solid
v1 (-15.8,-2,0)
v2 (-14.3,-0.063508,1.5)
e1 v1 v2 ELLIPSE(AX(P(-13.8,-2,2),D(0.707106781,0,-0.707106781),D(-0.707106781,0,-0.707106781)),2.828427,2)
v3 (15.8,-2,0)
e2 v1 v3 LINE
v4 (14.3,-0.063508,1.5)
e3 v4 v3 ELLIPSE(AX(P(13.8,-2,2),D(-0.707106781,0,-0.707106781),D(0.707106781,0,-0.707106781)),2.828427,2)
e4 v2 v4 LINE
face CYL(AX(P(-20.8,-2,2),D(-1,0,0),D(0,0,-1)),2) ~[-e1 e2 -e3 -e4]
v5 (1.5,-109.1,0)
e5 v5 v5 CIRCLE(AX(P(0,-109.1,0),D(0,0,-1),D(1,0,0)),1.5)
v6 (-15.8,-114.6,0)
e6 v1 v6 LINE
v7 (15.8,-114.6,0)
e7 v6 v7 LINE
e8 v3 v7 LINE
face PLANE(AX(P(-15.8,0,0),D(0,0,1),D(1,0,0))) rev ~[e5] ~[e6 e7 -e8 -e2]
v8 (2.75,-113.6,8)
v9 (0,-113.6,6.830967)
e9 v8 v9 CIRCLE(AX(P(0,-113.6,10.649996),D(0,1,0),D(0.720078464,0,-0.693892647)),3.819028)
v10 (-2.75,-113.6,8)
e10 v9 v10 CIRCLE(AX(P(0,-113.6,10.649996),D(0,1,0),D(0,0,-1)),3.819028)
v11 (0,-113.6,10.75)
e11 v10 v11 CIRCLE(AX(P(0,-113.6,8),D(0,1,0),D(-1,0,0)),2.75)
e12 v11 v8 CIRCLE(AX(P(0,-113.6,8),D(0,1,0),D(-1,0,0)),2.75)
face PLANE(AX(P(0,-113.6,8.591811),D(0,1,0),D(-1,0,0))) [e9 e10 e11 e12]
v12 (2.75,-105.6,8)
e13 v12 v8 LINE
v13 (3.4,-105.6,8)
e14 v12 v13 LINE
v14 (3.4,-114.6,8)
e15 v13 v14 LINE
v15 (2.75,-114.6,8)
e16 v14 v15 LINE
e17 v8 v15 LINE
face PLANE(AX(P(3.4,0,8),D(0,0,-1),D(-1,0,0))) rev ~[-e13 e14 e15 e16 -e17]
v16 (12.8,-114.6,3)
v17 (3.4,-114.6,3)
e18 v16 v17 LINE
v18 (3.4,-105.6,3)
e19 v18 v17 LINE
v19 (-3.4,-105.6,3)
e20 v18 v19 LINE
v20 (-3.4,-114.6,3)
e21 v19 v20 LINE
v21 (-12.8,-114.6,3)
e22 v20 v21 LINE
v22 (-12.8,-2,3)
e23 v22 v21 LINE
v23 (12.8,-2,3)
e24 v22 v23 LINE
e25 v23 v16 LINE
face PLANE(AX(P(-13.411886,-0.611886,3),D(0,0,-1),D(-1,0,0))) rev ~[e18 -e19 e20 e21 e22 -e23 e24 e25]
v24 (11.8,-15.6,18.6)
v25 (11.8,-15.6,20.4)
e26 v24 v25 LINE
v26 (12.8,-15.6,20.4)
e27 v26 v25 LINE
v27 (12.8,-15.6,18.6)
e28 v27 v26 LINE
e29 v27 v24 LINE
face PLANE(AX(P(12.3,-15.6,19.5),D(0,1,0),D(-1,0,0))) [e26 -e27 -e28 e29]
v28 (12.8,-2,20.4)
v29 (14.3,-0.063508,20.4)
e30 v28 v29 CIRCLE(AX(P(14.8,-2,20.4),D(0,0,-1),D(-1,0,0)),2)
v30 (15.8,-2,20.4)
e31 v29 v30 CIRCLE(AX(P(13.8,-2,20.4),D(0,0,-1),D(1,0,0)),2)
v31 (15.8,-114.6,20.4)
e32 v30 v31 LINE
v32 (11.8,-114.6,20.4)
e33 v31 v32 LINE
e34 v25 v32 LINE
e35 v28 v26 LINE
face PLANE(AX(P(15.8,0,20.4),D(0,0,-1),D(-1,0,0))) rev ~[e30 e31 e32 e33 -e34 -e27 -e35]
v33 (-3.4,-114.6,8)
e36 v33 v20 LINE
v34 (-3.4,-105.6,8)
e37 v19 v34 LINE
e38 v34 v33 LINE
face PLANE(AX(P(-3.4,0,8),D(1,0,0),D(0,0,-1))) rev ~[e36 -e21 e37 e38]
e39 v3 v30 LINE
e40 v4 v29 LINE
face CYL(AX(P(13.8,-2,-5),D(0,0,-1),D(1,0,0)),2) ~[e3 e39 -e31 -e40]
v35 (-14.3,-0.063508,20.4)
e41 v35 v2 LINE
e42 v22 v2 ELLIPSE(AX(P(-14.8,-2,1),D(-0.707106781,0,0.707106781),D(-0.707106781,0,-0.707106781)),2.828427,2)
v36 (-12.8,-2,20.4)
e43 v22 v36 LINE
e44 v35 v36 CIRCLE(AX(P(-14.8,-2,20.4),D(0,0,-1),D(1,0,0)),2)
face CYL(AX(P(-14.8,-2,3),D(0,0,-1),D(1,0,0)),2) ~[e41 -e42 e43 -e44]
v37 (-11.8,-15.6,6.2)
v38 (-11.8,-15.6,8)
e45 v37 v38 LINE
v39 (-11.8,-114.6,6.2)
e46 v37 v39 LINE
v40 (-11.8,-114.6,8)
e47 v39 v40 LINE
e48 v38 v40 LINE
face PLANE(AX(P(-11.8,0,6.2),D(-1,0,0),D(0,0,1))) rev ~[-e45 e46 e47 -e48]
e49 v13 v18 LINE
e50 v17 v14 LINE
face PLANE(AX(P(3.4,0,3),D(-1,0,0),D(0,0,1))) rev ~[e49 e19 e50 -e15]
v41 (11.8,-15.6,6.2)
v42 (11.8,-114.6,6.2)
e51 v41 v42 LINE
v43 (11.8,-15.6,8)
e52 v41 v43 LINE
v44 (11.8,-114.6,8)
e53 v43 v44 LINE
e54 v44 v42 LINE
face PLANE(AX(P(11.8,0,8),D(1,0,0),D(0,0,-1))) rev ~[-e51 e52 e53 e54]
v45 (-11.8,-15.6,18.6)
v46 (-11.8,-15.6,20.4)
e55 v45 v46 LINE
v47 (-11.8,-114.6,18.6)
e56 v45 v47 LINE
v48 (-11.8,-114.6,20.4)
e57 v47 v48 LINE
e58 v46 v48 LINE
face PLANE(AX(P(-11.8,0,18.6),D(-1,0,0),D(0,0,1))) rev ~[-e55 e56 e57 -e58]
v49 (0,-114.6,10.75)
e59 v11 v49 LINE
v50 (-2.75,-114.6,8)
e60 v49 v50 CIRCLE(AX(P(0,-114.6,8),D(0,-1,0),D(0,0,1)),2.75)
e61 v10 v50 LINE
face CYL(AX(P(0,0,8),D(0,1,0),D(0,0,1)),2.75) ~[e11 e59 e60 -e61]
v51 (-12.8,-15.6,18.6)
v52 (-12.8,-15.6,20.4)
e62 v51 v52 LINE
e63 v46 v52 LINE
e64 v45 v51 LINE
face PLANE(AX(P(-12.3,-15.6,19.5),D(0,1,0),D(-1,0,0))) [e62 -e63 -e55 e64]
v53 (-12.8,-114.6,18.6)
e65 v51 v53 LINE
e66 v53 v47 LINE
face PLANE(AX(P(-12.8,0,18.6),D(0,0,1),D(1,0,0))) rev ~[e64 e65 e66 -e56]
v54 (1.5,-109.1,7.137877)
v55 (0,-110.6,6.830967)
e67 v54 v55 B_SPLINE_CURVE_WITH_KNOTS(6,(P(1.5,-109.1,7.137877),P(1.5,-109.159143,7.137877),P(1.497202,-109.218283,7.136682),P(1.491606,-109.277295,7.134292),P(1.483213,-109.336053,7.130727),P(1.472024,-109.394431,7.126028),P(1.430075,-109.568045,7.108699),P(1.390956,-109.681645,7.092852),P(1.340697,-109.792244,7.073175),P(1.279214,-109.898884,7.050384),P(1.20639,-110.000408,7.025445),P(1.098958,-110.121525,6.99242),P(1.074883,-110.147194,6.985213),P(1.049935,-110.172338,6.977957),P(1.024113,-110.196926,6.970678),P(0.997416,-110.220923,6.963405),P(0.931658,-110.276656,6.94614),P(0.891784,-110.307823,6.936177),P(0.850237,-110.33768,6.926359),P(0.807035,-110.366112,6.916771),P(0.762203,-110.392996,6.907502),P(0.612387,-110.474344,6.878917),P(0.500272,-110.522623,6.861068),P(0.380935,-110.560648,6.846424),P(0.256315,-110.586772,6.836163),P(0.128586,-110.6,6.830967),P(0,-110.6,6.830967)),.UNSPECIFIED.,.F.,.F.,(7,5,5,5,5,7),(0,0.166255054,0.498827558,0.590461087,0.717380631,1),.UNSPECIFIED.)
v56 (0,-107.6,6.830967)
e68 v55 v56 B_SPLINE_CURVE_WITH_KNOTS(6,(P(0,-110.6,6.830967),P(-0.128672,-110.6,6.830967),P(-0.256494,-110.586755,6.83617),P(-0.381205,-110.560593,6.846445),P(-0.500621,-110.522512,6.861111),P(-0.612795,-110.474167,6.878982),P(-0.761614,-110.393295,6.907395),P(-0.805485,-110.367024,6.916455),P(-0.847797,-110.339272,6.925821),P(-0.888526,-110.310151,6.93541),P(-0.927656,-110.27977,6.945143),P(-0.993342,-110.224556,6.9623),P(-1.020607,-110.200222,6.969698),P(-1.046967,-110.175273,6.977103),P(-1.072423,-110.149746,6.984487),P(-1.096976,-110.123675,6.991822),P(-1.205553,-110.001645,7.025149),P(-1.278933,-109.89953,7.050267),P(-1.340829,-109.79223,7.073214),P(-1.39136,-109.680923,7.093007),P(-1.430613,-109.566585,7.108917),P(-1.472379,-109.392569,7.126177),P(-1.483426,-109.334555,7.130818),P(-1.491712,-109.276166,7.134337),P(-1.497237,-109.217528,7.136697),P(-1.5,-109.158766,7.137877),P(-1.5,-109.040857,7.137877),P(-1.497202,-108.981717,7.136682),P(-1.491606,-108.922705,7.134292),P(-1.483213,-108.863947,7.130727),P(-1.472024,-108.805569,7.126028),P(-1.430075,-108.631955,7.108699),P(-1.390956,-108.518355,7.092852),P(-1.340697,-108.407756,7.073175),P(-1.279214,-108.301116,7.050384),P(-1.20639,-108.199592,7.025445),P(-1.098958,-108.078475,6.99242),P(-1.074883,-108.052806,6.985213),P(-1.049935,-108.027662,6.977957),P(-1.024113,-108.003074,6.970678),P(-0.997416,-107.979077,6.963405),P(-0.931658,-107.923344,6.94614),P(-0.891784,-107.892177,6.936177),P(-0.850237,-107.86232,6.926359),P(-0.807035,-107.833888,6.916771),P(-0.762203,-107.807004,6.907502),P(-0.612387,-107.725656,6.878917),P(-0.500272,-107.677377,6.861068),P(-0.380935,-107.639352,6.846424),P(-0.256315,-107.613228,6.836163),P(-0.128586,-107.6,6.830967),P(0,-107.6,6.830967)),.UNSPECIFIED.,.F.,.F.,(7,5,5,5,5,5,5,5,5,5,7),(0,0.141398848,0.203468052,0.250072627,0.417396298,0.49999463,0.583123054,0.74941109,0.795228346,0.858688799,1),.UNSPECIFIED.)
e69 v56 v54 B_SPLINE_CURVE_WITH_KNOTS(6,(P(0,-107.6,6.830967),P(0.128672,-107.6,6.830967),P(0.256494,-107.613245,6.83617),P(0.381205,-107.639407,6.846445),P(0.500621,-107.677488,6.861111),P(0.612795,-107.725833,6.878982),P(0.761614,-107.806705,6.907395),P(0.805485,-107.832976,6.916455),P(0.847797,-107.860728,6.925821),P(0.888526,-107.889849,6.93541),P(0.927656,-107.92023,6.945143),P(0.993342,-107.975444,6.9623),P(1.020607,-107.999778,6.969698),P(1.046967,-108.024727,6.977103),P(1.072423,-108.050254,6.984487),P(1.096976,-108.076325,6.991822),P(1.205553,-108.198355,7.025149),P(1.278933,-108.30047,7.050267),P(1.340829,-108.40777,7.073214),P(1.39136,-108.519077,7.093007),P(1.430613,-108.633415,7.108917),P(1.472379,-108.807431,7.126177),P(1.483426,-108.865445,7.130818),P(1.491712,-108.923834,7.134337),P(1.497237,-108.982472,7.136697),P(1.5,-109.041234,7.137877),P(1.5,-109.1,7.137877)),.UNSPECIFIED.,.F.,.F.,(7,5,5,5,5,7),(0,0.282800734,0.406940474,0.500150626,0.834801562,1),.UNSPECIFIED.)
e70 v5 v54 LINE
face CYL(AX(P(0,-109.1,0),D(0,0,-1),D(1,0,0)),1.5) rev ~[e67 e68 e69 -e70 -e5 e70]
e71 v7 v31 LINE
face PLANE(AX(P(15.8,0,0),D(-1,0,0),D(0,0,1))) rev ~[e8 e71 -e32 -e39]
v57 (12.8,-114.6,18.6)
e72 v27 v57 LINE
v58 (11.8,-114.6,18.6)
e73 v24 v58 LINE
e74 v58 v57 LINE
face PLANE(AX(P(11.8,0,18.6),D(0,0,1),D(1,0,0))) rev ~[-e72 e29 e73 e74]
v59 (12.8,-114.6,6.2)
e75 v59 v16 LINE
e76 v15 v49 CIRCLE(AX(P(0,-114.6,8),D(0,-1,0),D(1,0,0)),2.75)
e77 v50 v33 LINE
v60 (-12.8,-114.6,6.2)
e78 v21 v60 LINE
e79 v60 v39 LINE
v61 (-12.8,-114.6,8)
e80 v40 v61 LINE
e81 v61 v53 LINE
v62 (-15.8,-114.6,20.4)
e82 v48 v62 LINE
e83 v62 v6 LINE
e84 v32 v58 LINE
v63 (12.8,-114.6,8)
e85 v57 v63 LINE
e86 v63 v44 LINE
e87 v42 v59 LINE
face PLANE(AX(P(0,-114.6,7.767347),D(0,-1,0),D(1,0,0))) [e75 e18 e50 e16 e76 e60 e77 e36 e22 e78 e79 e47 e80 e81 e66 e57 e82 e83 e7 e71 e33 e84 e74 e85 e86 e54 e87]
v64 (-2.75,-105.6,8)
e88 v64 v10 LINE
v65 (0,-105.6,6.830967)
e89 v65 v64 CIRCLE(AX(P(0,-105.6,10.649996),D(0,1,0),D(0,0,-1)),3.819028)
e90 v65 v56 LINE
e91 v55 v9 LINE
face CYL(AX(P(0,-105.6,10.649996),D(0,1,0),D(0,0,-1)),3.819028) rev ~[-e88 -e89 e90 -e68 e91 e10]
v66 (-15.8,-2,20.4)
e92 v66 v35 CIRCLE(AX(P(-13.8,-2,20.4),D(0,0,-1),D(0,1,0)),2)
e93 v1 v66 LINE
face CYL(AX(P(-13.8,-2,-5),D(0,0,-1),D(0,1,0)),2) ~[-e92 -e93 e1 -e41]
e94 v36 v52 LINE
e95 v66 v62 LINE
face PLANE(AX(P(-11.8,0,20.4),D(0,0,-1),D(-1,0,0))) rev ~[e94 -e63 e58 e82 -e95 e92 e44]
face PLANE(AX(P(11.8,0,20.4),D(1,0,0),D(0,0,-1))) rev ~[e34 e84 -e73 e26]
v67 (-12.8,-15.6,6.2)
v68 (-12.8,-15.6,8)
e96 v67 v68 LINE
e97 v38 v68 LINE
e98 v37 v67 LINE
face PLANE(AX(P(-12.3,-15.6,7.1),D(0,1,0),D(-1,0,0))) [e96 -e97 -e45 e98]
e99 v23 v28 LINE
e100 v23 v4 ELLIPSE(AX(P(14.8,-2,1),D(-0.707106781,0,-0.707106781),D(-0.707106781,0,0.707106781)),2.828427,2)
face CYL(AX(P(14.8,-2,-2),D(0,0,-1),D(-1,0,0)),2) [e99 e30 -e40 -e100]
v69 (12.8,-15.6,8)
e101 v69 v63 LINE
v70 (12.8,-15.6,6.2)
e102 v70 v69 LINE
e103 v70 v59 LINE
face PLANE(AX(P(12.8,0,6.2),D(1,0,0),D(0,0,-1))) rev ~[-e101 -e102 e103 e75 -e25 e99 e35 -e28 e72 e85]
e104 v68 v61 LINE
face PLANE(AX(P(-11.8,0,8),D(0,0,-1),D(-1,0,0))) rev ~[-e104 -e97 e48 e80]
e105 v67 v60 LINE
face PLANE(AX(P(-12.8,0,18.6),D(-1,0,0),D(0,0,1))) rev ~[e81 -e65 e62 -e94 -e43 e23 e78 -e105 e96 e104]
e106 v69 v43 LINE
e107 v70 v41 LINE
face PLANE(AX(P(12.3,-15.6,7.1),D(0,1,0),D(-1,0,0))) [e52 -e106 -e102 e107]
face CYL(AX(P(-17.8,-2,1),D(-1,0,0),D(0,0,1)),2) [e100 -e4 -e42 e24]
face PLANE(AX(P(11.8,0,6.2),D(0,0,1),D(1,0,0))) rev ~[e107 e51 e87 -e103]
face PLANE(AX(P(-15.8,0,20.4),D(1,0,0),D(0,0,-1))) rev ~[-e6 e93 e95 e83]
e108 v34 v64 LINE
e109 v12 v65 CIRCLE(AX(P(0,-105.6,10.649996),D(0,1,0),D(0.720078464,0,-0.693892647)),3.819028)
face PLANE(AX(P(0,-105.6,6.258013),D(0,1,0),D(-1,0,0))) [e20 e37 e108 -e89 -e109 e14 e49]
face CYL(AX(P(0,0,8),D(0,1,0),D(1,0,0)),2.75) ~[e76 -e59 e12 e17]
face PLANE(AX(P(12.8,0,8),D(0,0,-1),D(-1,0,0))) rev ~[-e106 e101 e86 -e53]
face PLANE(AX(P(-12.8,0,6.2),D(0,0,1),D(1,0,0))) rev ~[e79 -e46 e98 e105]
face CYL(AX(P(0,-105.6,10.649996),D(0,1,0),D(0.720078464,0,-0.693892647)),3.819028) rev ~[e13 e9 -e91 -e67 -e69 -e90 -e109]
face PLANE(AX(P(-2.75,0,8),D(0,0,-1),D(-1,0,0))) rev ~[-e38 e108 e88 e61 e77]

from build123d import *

# Parameters (mm, degrees)
F1_DEPTH      = 114.6
F3_DEPTH      = 105.6
F5_DEPTH      = 8
F6_R          = 1.5
F7_DEPTH      = 20.401
F8_W          = 1
F8_H          = 1.8
F9_DEPTH      = 15.6
F10_T1_DEPTH  = 22.4
F10_T3_DEPTH  = 30.4
F10_T5_DEPTH  = 25.6
F10_T7_DEPTH  = 41.6
F10_T13_DEPTH = 30.6
F10_T17_DEPTH = 27.4
F10_T24_DEPTH = 30.6
F10_T28_DEPTH = 27.4


# Not quite as in the source:
# - a fillet or chamfer that OpenCascade refuses, or shapes differently, is made with other operations: its cross-section is extruded or revolved along the edge and cut away or added


with BuildPart() as f1:
    # F0 (on Front) → F1 (new body)
    with BuildSketch(Plane.XZ):
        Polygon((-15.8, 0), (0, 0), (15.8, 0), (15.8, 20.4), (11.8, 20.4), (11.8, 18.6), (12.8, 18.6), (12.8, 8), (11.8, 8), (11.8, 6.2), (12.8, 6.2), (12.8, 3), (3.4, 3), (3.4, 8), (2.75, 8), (0, 8), (-2.75, 8), (-3.4, 8), (-3.4, 3), (-12.8, 3), (-12.8, 6.2), (-11.8, 6.2), (-11.8, 8), (-12.8, 8), (-12.8, 18.6), (-11.8, 18.6), (-11.8, 20.4), (-15.8, 20.4), align=None)
        with BuildLine():
            ThreePointArc((0, 10.75), (-1.9445436483, 9.9445436483), (-2.75, 8))
            Line((-2.75, 8), (0, 8))
            Line((0, 8), (0, 10.75))
        make_face()
        with BuildLine():
            Line((0, 8), (2.75, 8))
            ThreePointArc((2.75, 8), (1.9445436483, 9.9445436483), (0, 10.75))
            Line((0, 10.75), (0, 8))
        make_face()
    extrude(amount=F1_DEPTH)

    # F2 (on face) → F3 (cut)
    with BuildSketch(Plane(origin=(0, 0, 0), x_dir=(-1, 0, 0), z_dir=(0, 1, 0))):
        with BuildLine():
            Line((-3.4, 8), (-3.4, 3))
            Line((-3.4, 3), (3.4, 3))
            Line((3.4, 3), (3.4, 8))
            Line((3.4, 8), (2.75, 8))
            ThreePointArc((2.75, 8), (0, 10.75), (-2.75, 8))
            Line((-2.75, 8), (-3.4, 8))
        make_face()
    extrude(amount=-F3_DEPTH, mode=Mode.SUBTRACT)

    # F4 (on face) → F5 (cut)
    with BuildSketch(Plane(origin=(0, -105.6, 0), x_dir=(-1, 0, 0), z_dir=(0, 1, 0))):
        with BuildLine():
            ThreePointArc((2.75, 8), (0, 10.75), (-2.75, 8))
            ThreePointArc((-2.75, 8), (-1.4940831044, 7.1353558864), (0, 6.8309673695))
            ThreePointArc((0, 6.8309673695), (1.4940831044, 7.1353558864), (2.75, 8))
        make_face()
    extrude(amount=-F5_DEPTH, mode=Mode.SUBTRACT)

    # F6 (on face) → F7 (cut, through all)
    with BuildSketch(Plane(origin=(0, 0, 0), x_dir=(1, 0, 0), z_dir=(0, 0, -1))):
        with Locations((0, 109.1)):
            Circle(F6_R)
    extrude(amount=-F7_DEPTH, mode=Mode.SUBTRACT)

    # F8 (on face) → F9 (cut)
    with BuildSketch(Plane(origin=(0, 0, 0), x_dir=(-1, 0, 0), z_dir=(0, 1, 0))):
        with Locations((-12.3, 19.5)):
            Rectangle(F8_W, F8_H)
        with Locations((-12.3, 7.1)):
            Rectangle(F8_W, F8_H)
        with Locations((12.3, 7.1)):
            Rectangle(F8_W, F8_H)
        with Locations((12.3, 19.5)):
            Rectangle(F8_W, F8_H)
    extrude(amount=-F9_DEPTH, mode=Mode.SUBTRACT)

    # F10: fillet of radius 2 on 6 edges, made by hand

    # F10_s2 → F10_t1 (cut)
    with BuildSketch(Plane.XY.offset(3)):
        with BuildLine():
            ThreePointArc((12.8, -2), (13.3857864376, -0.5857864376), (14.8, 0))
            Line((14.8, 0), (12.8, 0))
            Line((12.8, 0), (12.8, -2))
        make_face()
        with BuildLine():
            ThreePointArc((-12.8, -2), (-13.3857864376, -0.5857864376), (-14.8, 0))
            Line((-14.8, 0), (-12.8, 0))
            Line((-12.8, 0), (-12.8, -2))
        make_face()
    extrude(amount=F10_T1_DEPTH, mode=Mode.SUBTRACT)

    # F10_s4 → F10_t3 (cut)
    with BuildSketch(Plane.XY.offset(-5)):
        with BuildLine():
            ThreePointArc((15.8, -2), (15.2142135624, -0.5857864376), (13.8, 0))
            Line((13.8, 0), (15.8, 0))
            Line((15.8, 0), (15.8, -2))
        make_face()
        with BuildLine():
            ThreePointArc((-13.8, 0), (-15.2142135624, -0.5857864376), (-15.8, -2))
            Line((-15.8, -2), (-15.8, 0))
            Line((-15.8, 0), (-13.8, 0))
        make_face()
    extrude(amount=F10_T3_DEPTH, mode=Mode.SUBTRACT)

    # F10_s6 → F10_t5 (cut)
    with BuildSketch(Plane.YZ.offset(-12.8)):
        with BuildLine():
            ThreePointArc((-2, 3), (-0.5857864376, 2.4142135624), (0, 1))
            Line((0, 1), (0, 3))
            Line((0, 3), (-2, 3))
        make_face()
    extrude(amount=F10_T5_DEPTH, mode=Mode.SUBTRACT)

    # F10_s8 → F10_t7 (cut)
    with BuildSketch(Plane.YZ.offset(-20.8)):
        with BuildLine():
            ThreePointArc((-2, 0), (-0.5857864376, 0.5857864376), (0, 2))
            Line((0, 2), (0, 0))
            Line((0, 0), (-2, 0))
        make_face()
    extrude(amount=F10_T7_DEPTH, mode=Mode.SUBTRACT)


with BuildPart() as f10_tool11:
    # F10_s12 → F10_t13 (new body)
    with BuildSketch(Plane.YZ.offset(-12.8)):
        with BuildLine():
            ThreePointArc((-2, 3), (-0.5857864376, 2.4142135624), (0, 1))
            Line((0, 1), (0, 3))
            Line((0, 3), (-2, 3))
        make_face()
    extrude(amount=F10_T13_DEPTH)

    split(bisect_by=Plane.YZ.offset(12.8), keep=Keep.TOP)


with BuildPart() as f10_tool15:
    # F10_s16 → F10_t17 (new body)
    with BuildSketch(Plane.XY.offset(-2)):
        with BuildLine():
            ThreePointArc((12.8, -2), (13.3857864376, -0.5857864376), (14.8, 0))
            Line((14.8, 0), (12.8, 0))
            Line((12.8, 0), (12.8, -2))
        make_face()
    extrude(amount=F10_T17_DEPTH)

    split(bisect_by=Plane.XY.offset(3), keep=Keep.BOTTOM)


with BuildPart() as f10_tool11_1:
    add(f10_tool11.part)

    # F10_t19: intersect F10_tool15
    add(f10_tool15.part, mode=Mode.INTERSECT)


with BuildPart() as f1_1:
    add(f1.part)

    # F10_t9: cut F10_tool11
    add(f10_tool11_1.part, mode=Mode.SUBTRACT)


with BuildPart() as f10_tool22:
    # F10_s23 → F10_t24 (new body)
    with BuildSketch(Plane.YZ.offset(-17.8)):
        with BuildLine():
            ThreePointArc((-2, 3), (-0.5857864376, 2.4142135624), (0, 1))
            Line((0, 1), (0, 3))
            Line((0, 3), (-2, 3))
        make_face()
    extrude(amount=F10_T24_DEPTH)

    split(bisect_by=Plane.YZ.offset(-12.8), keep=Keep.BOTTOM)


with BuildPart() as f10_tool26:
    # F10_s27 → F10_t28 (new body)
    with BuildSketch(Plane.XY.offset(25.4)):
        with BuildLine():
            ThreePointArc((-12.8, -2), (-13.3857864376, -0.5857864376), (-14.8, 0))
            Line((-14.8, 0), (-12.8, 0))
            Line((-12.8, 0), (-12.8, -2))
        make_face()
    extrude(amount=-F10_T28_DEPTH)

    split(bisect_by=Plane.XY.offset(3), keep=Keep.BOTTOM)


with BuildPart() as f10_tool22_1:
    add(f10_tool22.part)

    # F10_t30: intersect F10_tool26
    add(f10_tool26.part, mode=Mode.INTERSECT)


with BuildPart() as f1_2:
    add(f1_1.part)

    # F10_t20: cut F10_tool22
    add(f10_tool22_1.part, mode=Mode.SUBTRACT)


solid = f1_2.part
